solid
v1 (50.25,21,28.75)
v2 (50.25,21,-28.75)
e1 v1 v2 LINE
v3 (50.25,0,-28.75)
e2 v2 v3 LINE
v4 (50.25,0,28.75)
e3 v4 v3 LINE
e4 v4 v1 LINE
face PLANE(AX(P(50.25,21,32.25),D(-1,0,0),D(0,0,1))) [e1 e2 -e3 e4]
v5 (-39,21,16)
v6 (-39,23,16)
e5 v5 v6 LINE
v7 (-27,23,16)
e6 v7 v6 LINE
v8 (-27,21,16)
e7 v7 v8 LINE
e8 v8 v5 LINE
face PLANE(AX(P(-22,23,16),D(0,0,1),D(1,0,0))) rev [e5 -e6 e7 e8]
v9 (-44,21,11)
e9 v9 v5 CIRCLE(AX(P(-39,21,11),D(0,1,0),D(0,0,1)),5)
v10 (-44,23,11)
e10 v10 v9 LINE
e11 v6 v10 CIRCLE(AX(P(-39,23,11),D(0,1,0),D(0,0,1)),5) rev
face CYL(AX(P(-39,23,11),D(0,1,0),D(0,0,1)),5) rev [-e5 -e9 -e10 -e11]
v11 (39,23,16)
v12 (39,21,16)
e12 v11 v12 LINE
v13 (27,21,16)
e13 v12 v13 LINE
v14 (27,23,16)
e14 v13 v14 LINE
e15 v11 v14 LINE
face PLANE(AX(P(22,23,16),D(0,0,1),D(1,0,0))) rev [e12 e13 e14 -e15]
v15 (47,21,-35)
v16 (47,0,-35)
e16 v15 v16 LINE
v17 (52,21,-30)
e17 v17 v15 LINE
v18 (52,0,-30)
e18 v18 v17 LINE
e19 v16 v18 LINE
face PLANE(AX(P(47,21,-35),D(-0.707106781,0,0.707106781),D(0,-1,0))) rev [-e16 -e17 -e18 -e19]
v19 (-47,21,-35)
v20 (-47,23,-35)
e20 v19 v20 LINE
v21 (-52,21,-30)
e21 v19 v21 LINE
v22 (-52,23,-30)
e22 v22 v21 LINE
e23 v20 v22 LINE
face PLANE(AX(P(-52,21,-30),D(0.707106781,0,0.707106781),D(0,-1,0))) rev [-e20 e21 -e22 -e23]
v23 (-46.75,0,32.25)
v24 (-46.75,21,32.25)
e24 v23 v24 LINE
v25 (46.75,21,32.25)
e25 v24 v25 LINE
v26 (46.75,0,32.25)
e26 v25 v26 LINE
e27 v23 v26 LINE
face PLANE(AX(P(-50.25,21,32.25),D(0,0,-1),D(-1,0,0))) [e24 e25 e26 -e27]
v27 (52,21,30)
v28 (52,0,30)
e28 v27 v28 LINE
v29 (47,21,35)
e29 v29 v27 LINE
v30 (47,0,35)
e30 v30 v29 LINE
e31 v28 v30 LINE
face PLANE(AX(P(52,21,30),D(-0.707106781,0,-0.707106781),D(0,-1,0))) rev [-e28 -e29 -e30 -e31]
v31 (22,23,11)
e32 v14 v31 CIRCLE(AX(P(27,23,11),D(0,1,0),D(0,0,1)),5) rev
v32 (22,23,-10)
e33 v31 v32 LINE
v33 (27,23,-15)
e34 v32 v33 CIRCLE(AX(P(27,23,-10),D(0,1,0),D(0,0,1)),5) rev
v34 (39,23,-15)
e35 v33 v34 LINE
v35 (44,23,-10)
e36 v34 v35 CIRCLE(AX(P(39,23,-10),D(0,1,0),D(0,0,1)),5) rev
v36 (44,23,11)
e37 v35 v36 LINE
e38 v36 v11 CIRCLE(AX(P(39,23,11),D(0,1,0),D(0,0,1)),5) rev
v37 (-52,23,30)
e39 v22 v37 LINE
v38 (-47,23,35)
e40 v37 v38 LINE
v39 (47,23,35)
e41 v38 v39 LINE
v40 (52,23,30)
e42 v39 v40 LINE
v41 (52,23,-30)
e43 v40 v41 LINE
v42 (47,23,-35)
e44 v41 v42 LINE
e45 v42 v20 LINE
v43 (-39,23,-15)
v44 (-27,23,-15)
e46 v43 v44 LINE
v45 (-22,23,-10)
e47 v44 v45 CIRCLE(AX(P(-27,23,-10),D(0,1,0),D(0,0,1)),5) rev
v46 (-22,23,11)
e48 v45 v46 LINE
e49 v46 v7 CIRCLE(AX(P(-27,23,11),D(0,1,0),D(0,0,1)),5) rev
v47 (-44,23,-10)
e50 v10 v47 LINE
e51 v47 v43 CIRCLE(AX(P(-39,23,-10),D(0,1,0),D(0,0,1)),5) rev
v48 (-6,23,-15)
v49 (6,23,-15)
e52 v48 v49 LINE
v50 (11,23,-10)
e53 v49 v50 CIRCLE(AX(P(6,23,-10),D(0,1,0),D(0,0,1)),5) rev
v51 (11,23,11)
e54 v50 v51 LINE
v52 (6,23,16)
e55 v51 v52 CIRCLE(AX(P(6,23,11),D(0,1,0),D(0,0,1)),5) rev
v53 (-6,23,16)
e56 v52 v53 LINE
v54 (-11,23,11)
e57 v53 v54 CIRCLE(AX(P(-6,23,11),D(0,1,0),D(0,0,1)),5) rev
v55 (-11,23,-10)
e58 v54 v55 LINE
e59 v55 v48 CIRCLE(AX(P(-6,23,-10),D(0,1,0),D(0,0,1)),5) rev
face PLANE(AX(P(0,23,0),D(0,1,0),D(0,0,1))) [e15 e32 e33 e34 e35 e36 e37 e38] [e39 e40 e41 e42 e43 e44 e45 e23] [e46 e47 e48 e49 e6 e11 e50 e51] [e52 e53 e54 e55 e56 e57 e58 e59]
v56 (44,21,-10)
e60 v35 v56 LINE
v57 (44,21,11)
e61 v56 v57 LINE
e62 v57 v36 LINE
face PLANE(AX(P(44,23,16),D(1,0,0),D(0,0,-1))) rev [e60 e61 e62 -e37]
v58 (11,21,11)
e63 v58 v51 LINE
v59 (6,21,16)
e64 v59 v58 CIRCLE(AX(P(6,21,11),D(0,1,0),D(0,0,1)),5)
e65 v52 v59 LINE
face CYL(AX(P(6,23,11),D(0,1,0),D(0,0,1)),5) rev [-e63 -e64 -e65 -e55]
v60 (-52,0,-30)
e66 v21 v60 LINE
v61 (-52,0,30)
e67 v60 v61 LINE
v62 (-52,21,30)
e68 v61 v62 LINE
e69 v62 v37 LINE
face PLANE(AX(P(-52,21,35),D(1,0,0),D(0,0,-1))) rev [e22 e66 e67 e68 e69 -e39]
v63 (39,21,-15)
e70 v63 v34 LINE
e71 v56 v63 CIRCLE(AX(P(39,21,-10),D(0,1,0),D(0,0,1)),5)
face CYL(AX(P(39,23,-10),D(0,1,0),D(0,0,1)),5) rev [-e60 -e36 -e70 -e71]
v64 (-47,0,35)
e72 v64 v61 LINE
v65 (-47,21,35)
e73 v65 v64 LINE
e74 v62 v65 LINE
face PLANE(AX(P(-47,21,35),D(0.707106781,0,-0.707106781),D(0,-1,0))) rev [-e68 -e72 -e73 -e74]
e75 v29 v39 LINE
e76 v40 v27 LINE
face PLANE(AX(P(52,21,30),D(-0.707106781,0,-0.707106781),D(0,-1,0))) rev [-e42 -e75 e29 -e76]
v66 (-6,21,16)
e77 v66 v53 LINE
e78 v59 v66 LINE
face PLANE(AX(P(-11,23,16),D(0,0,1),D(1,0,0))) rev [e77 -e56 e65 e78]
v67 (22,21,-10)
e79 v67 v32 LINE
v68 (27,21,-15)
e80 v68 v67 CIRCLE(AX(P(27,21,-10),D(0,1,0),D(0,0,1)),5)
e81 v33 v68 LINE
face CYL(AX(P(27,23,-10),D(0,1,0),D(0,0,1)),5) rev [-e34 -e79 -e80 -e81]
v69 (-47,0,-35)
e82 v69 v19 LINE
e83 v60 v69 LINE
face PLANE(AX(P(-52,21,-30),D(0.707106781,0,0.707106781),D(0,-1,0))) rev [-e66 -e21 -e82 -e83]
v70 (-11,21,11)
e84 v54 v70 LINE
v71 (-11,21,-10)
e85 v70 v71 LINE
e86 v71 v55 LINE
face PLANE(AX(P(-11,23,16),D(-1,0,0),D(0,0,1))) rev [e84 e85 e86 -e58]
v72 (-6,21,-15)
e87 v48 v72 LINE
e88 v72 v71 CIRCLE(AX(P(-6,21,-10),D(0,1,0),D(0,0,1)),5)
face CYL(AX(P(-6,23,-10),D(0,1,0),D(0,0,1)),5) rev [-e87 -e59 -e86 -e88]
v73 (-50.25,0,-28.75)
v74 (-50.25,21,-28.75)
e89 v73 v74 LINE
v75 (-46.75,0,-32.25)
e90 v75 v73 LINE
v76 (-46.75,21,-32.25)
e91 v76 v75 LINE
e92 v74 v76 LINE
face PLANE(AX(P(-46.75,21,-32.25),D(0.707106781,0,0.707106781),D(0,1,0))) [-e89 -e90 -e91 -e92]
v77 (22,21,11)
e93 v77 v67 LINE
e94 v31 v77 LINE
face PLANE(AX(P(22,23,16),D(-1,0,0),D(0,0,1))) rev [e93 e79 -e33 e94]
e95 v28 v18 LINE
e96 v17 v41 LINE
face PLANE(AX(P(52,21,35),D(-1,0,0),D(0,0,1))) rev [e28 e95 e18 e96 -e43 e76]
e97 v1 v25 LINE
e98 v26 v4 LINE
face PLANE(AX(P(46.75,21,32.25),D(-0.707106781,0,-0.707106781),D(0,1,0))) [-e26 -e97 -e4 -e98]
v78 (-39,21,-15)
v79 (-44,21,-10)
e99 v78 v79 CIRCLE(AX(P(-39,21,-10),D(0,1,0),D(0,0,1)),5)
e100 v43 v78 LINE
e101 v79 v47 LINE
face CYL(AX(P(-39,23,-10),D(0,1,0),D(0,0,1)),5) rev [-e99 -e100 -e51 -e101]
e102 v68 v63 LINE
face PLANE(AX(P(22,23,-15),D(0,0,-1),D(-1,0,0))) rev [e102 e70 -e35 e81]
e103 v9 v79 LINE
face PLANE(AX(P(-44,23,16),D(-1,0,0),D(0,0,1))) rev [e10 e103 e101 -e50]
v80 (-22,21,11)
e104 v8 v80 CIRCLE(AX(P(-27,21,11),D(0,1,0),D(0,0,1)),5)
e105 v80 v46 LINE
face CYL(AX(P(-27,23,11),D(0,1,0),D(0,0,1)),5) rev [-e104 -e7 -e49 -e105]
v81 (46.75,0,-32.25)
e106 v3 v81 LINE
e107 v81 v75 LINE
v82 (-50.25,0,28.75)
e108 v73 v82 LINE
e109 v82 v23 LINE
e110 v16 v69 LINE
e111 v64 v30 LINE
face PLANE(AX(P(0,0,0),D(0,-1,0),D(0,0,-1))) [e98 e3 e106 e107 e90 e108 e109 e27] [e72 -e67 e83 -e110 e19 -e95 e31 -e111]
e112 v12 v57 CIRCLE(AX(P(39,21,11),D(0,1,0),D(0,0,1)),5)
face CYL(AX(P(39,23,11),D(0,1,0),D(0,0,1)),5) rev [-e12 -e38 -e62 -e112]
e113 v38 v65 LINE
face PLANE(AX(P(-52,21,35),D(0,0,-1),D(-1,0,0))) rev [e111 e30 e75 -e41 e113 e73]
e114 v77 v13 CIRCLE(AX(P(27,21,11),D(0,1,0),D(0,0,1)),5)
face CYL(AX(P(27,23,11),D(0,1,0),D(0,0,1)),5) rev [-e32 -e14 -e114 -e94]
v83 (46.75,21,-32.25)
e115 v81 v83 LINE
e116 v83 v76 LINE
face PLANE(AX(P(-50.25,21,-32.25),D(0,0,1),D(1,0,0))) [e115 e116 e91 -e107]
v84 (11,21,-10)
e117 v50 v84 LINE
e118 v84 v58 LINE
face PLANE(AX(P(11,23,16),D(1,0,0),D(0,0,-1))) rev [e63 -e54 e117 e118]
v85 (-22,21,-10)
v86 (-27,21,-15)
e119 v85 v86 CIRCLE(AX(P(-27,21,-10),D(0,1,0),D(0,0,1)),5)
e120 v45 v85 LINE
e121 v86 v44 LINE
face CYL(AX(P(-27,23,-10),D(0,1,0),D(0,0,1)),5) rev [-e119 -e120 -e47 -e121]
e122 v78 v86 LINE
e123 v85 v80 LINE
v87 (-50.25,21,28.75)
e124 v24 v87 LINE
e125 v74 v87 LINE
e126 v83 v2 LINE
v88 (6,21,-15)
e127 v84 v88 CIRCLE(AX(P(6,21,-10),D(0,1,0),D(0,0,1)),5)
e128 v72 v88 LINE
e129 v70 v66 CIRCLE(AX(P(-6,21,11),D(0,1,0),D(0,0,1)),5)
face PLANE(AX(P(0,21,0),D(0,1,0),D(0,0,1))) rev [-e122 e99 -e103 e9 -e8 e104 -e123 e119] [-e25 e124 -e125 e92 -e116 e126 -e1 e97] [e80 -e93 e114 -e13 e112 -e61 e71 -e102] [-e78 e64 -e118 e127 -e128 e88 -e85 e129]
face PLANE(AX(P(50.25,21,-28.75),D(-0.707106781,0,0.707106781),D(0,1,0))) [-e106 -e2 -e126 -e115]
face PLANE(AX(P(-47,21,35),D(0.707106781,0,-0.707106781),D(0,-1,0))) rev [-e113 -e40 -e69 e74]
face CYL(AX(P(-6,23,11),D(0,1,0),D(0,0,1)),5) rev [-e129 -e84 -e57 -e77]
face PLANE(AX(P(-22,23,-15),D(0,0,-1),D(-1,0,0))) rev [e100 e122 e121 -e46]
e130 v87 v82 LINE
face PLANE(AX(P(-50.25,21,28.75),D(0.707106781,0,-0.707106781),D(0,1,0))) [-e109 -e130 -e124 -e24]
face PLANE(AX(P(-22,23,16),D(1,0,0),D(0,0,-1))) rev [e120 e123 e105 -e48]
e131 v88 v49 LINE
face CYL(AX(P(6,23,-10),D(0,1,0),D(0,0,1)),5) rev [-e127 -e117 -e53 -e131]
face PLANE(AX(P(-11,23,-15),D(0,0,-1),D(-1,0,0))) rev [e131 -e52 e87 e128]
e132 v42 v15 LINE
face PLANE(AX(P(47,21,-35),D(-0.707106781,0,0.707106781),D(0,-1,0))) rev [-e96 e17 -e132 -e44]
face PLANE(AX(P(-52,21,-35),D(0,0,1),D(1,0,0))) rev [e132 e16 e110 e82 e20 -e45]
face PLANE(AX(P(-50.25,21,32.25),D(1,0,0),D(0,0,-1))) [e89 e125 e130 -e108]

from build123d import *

# Parameters (mm, degrees)
SKETCH1_W           = 104
SKETCH1_H           = 70
SKETCH1_W_2         = 100.5
SKETCH1_H_2         = 64.5
BOSS_EXTRUDE1_DEPTH = 21
CHAMFER2_SIZE       = 3.5
CHAMFER3_SIZE       = 5
SKETCH3_W           = 104
SKETCH3_H           = 70
BOSS_EXTRUDE2_DEPTH = 2
CHAMFER4_SIZE       = 5
SKETCH4_W           = 22
SKETCH4_H           = 31
CUT_EXTRUDE1_DEPTH  = 2
FILLET1_R           = 5


with BuildPart() as part:
    # Sketch1 → Boss-Extrude1 (new body)
    with BuildSketch(Plane(origin=(0, 0, 0), x_dir=(1, 0, 0), z_dir=(0, 1, 0))):
        Rectangle(SKETCH1_W, SKETCH1_H)
        Rectangle(SKETCH1_W_2, SKETCH1_H_2, mode=Mode.SUBTRACT)
    extrude(amount=BOSS_EXTRUDE1_DEPTH)

    # Chamfer2
    chamfer2_edges = [part.edges().sort_by_distance(p)[0] for p in [
        (50.25, 10.5, 32.25),
        (50.25, 10.5, -32.25),
        (-50.25, 10.5, -32.25),
        (-50.25, 10.5, 32.25),
    ]]
    chamfer(chamfer2_edges, length=CHAMFER2_SIZE)

    # Chamfer3
    chamfer3_edges = [part.edges().sort_by_distance(p)[0] for p in [
        (52, 10.5, 35),
        (-52, 10.5, 35),
        (-52, 10.5, -35),
        (52, 10.5, -35),
    ]]
    chamfer(chamfer3_edges, length=CHAMFER3_SIZE)

    # Sketch3 → Boss-Extrude2 (add)
    with BuildSketch(Plane(origin=(0, 21, 0), x_dir=(1, 0, 0), z_dir=(0, 1, 0))):
        Rectangle(SKETCH3_W, SKETCH3_H)
    extrude(amount=BOSS_EXTRUDE2_DEPTH)

    # Chamfer4
    chamfer4_edges = [part.edges().sort_by_distance(p)[0] for p in [
        (-52, 22, 35),
        (52, 22, 35),
        (52, 22, -35),
        (-52, 22, -35),
    ]]
    chamfer(chamfer4_edges, length=CHAMFER4_SIZE - 0.0001)  # a hair under: the kernel refuses the full size

    # Sketch4 → Cut-Extrude1 (cut)
    with BuildSketch(Plane.XZ.offset(-21)):
        with Locations((0, 0.5)):
            Rectangle(SKETCH4_W, SKETCH4_H)
        with Locations((33, 0.5)):
            Rectangle(SKETCH4_W, SKETCH4_H)
        with Locations((-33, 0.5)):
            Rectangle(SKETCH4_W, SKETCH4_H)
    extrude(amount=-CUT_EXTRUDE1_DEPTH, mode=Mode.SUBTRACT)

    # Fillet1
    fillet1_edges = [part.edges().sort_by_distance(p)[0] for p in [
        (-11, 22, -15),
        (-11, 22, 16),
        (11, 22, 16),
        (11, 22, -15),
        (22, 22, -15),
        (22, 22, 16),
        (44, 22, 16),
        (44, 22, -15),
        (-22, 22, 16),
        (-22, 22, -15),
        (-44, 22, -15),
        (-44, 22, 16),
    ]]
    fillet(fillet1_edges, radius=FILLET1_R)


solid = part.part
